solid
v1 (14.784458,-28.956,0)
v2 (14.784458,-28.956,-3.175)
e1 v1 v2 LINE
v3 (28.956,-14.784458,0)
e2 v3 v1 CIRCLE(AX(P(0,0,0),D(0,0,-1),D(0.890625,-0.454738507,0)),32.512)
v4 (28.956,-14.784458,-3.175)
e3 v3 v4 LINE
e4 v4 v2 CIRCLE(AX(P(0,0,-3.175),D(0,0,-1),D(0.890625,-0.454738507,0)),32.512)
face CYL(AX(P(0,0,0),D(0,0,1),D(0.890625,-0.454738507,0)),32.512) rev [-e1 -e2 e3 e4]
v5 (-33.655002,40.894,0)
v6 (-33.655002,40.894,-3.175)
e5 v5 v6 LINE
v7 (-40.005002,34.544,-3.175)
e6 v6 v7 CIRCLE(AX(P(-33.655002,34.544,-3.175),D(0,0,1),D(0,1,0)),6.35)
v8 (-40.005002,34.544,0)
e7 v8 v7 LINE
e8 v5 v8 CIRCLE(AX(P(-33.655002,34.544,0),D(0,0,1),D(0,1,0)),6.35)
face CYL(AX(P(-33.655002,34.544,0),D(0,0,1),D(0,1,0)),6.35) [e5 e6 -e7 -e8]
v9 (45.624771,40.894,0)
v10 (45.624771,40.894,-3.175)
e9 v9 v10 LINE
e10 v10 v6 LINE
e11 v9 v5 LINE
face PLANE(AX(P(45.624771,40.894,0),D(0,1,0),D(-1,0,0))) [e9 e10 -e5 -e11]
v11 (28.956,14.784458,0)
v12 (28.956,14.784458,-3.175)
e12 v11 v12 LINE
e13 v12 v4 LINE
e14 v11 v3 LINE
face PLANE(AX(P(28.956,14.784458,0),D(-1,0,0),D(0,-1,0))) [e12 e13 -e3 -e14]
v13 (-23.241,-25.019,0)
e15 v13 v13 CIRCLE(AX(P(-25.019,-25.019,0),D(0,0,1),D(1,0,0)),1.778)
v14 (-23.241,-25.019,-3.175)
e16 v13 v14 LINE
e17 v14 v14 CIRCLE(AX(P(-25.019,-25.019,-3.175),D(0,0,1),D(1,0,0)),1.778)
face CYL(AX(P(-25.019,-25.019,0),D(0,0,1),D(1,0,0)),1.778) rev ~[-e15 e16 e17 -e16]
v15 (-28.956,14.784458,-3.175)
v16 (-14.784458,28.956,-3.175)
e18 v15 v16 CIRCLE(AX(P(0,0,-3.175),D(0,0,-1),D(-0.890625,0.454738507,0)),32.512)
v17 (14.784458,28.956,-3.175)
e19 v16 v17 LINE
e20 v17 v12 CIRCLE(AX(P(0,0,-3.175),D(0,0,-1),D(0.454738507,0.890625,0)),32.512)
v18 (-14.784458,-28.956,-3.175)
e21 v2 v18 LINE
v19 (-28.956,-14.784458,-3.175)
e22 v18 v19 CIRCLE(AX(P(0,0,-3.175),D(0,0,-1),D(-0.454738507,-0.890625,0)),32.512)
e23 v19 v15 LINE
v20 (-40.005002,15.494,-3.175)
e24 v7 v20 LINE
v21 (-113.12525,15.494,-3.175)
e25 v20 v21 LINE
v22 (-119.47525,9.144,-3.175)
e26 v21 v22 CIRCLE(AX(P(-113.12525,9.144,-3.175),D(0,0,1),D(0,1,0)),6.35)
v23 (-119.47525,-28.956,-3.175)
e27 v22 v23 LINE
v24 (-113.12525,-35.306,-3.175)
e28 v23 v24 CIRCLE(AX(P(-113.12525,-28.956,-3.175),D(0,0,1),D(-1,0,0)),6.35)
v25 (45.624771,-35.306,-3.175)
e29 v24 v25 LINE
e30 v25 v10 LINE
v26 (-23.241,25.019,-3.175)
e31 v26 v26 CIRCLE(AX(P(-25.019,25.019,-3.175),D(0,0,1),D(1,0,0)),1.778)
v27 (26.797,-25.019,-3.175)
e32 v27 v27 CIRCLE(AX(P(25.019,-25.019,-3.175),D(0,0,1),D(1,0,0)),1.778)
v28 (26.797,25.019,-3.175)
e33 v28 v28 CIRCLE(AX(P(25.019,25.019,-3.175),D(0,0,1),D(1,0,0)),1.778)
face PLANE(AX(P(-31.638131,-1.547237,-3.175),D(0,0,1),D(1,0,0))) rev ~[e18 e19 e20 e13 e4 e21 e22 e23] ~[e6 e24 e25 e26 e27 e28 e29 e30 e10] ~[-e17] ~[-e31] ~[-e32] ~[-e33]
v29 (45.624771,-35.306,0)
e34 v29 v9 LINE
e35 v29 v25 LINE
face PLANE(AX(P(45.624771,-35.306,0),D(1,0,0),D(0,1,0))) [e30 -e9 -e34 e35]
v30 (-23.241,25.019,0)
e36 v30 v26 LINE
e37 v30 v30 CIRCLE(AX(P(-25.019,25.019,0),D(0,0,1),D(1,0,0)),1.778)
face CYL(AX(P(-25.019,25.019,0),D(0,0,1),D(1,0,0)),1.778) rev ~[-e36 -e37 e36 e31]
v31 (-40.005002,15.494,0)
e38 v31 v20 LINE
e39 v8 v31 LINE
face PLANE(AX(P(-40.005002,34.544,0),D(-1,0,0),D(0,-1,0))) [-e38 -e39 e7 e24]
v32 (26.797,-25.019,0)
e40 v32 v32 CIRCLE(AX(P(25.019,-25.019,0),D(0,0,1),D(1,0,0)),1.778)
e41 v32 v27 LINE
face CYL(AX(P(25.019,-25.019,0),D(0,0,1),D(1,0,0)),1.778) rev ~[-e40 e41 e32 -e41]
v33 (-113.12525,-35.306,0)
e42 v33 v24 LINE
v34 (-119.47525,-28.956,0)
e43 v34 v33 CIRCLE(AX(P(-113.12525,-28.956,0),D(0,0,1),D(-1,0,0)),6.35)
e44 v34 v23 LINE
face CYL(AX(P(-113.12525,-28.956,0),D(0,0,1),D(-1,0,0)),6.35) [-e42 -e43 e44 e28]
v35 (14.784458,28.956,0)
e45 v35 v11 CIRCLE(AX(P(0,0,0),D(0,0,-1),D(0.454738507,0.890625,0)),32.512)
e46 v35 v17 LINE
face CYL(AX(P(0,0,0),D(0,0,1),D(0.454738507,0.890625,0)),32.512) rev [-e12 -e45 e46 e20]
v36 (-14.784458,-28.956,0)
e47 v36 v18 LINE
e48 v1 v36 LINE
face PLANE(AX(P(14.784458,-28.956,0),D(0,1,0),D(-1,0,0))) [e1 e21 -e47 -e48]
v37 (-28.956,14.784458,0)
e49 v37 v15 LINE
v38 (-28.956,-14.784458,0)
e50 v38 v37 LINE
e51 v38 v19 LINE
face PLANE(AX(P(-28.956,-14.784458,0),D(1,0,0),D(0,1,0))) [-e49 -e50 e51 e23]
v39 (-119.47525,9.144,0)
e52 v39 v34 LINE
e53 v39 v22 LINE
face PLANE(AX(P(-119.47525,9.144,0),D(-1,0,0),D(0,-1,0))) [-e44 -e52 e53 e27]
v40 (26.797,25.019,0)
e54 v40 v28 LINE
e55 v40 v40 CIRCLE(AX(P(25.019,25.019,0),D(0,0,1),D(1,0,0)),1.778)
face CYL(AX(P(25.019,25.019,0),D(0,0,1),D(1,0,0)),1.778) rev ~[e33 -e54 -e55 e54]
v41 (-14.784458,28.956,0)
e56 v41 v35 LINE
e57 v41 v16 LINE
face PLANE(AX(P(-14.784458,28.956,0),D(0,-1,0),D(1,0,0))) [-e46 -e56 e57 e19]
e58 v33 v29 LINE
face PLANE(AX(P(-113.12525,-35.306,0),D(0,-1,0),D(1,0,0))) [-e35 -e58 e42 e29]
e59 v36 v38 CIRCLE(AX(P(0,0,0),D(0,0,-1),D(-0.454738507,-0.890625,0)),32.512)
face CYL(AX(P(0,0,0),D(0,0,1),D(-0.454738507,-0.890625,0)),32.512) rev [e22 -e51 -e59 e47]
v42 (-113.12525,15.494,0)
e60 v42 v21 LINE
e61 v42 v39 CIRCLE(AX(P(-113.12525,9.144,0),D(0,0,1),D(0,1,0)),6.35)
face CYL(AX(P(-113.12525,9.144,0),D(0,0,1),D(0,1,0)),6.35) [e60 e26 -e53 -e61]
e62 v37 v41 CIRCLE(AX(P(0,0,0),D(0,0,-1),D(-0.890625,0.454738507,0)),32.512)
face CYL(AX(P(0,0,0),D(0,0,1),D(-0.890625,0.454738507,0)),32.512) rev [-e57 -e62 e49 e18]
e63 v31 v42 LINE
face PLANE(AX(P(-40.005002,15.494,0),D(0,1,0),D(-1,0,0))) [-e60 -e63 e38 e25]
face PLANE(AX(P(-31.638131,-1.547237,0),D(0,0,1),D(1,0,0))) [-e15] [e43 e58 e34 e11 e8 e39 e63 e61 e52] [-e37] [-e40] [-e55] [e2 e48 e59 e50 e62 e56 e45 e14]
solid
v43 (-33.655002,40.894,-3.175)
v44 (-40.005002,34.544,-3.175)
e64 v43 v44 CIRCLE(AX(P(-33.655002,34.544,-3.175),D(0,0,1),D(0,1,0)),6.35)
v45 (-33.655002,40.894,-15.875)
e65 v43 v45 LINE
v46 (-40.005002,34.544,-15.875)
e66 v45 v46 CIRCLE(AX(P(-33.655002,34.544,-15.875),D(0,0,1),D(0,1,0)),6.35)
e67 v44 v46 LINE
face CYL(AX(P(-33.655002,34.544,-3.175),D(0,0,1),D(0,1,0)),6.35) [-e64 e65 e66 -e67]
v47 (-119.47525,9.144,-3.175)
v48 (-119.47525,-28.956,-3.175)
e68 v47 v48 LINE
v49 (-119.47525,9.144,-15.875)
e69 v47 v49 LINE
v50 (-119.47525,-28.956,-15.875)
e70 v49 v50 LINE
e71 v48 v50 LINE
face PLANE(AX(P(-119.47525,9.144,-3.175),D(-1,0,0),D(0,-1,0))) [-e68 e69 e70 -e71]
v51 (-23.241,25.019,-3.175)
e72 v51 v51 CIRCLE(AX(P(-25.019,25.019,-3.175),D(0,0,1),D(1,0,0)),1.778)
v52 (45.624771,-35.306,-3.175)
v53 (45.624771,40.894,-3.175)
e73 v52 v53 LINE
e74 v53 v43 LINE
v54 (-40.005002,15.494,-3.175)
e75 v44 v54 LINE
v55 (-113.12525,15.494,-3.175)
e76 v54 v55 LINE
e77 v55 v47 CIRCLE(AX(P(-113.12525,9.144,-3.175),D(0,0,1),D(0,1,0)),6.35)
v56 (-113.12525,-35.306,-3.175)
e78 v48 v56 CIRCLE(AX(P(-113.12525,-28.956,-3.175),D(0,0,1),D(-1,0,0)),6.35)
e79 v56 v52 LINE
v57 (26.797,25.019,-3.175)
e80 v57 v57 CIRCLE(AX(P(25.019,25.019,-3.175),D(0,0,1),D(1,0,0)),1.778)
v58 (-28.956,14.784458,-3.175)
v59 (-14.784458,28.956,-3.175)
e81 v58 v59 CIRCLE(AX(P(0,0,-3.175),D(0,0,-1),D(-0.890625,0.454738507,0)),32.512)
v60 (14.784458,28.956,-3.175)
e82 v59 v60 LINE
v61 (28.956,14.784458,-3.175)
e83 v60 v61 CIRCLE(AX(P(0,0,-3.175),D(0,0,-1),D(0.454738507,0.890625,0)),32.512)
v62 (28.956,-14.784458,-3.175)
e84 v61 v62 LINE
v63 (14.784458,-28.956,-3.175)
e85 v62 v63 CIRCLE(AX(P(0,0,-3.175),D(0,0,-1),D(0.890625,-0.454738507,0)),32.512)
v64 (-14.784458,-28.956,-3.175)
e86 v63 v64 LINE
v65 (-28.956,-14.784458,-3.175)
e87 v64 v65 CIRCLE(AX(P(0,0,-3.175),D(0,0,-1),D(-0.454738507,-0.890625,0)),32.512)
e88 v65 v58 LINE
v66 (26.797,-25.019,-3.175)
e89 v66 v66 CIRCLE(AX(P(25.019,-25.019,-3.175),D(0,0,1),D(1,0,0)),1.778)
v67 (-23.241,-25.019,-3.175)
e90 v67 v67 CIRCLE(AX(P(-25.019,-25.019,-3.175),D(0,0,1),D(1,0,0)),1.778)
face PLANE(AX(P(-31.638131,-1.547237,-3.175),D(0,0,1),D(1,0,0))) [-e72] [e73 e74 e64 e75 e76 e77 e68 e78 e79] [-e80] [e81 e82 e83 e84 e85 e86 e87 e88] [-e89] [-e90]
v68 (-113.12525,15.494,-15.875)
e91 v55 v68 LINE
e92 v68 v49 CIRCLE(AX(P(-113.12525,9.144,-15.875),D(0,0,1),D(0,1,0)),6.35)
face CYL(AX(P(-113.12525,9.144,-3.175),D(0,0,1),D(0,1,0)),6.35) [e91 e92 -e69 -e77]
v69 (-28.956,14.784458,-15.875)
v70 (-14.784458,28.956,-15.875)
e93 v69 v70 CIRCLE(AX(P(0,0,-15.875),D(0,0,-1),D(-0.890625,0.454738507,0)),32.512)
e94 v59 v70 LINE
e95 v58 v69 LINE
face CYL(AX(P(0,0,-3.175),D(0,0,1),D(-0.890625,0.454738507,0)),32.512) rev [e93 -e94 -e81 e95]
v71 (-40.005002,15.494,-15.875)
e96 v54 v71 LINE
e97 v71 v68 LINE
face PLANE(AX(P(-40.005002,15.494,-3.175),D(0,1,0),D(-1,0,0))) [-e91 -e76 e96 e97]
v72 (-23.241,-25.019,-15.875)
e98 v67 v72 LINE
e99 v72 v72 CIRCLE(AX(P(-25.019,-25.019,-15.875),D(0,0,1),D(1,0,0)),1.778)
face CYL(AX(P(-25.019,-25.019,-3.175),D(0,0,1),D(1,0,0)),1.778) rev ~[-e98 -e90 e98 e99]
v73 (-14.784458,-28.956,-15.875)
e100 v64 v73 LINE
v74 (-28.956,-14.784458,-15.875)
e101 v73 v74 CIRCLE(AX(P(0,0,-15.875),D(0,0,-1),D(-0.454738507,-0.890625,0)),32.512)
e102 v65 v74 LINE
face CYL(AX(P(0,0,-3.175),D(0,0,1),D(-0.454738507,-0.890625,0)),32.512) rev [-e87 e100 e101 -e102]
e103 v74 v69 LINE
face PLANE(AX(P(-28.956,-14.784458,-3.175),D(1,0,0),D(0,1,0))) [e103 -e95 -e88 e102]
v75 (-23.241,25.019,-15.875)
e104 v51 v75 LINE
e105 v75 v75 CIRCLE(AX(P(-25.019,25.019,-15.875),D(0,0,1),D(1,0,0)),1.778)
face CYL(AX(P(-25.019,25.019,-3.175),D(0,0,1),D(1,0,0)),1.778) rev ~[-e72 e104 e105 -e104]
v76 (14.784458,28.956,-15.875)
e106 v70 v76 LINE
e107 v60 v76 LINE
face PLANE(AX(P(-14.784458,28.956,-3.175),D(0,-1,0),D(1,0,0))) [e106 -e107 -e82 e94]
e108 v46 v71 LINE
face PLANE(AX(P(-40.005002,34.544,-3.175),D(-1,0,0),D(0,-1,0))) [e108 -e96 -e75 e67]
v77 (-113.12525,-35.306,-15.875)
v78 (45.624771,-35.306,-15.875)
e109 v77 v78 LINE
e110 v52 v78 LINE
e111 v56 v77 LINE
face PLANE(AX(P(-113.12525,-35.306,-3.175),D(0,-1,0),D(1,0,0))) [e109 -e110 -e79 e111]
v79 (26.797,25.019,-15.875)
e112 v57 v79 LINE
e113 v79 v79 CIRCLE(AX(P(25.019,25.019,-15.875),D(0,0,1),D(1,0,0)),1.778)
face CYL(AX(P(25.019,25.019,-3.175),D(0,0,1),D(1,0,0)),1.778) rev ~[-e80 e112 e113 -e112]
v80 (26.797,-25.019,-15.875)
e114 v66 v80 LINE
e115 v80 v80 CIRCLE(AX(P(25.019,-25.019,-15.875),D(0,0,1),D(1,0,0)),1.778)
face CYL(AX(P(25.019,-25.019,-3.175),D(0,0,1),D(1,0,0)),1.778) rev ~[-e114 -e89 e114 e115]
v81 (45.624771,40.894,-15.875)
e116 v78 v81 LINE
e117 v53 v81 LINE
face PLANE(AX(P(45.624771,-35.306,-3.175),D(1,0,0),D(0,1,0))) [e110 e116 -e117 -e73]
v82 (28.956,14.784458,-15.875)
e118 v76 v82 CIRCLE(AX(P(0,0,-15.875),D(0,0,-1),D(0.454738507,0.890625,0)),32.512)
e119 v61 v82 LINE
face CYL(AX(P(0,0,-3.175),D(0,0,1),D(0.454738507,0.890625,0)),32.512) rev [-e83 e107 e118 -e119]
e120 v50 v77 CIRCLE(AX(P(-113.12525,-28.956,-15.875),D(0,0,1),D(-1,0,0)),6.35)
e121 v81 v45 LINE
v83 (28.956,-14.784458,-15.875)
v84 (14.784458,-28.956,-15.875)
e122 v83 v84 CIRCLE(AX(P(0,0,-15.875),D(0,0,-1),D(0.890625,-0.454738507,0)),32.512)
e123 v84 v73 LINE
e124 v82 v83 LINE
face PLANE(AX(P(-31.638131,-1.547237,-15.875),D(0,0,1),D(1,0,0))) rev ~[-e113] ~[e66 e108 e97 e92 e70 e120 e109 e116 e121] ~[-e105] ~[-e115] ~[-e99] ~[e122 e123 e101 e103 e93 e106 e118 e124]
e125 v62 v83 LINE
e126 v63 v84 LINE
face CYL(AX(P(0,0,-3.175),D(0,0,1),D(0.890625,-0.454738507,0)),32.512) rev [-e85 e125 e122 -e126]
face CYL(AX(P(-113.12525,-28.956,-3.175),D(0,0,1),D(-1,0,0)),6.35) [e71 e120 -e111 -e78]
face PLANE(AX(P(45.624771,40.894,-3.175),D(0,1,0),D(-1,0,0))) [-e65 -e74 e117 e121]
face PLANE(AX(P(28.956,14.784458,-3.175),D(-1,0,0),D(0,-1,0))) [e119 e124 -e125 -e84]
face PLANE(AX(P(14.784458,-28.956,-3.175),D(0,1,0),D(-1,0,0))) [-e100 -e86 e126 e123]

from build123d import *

# Parameters (mm, degrees)
F0_R     = 1.778
F1_DEPTH = 3.175
F2_DEPTH = 12.7


# Not quite as in the source:
# - a length typed as a fraction of an inch, garbled in the dataset ("3 / 203.2 mm" for 3/8 in), is restored
# - a feature names something its author has since deleted; it is built from what else it names


with BuildPart() as f1:
    # F0 (on Top) → F1 (new body)
    with BuildSketch(Plane.XY):
        with BuildLine():
            Line((-113.12525, -35.306), (32.92475, -35.306))
            Line((32.92475, -35.306), (45.6247710268, -35.306))
            Line((45.6247710268, -35.306), (45.6247710268, 40.894))
            Line((45.6247710268, 40.894), (32.92475, 40.894))
            Line((32.92475, 40.894), (-33.6550021708, 40.894))
            ThreePointArc((-33.6550021708, 40.894), (-38.1451302313, 39.0341280605), (-40.0050021708, 34.544))
            Line((-40.0050021708, 34.544), (-40.0050021708, 15.494))
            Line((-40.0050021708, 15.494), (-113.12525, 15.494))
            ThreePointArc((-113.12525, 15.494), (-117.6153780605, 13.6341280605), (-119.47525, 9.144))
            Line((-119.47525, 9.144), (-119.47525, -28.956))
            ThreePointArc((-119.47525, -28.956), (-117.6153780605, -33.4461280605), (-113.12525, -35.306))
        make_face()
        with Locations((-25.019, -25.019)):
            Circle(F0_R, mode=Mode.SUBTRACT)
        with Locations((25.019, -25.019)):
            Circle(F0_R, mode=Mode.SUBTRACT)
        with BuildLine():
            ThreePointArc((-28.956, 14.7844583262), (-22.9894556699, 22.9894556699), (-14.7844583262, 28.956))
            Line((-14.7844583262, 28.956), (14.7844583262, 28.956))
            ThreePointArc((14.7844583262, 28.956), (22.9894556699, 22.9894556699), (28.956, 14.7844583262))
            Line((28.956, 14.7844583262), (28.956, -14.7844583262))
            ThreePointArc((28.956, -14.7844583262), (22.9894556699, -22.9894556699), (14.7844583262, -28.956))
            Line((14.7844583262, -28.956), (-14.7844583262, -28.956))
            ThreePointArc((-14.7844583262, -28.956), (-22.9894556699, -22.9894556699), (-28.956, -14.7844583262))
            Line((-28.956, -14.7844583262), (-28.956, 14.7844583262))
        make_face(mode=Mode.SUBTRACT)
        with Locations((-25.019, 25.019)):
            Circle(F0_R, mode=Mode.SUBTRACT)
        with Locations((25.019, 25.019)):
            Circle(F0_R, mode=Mode.SUBTRACT)
    extrude(amount=-F1_DEPTH)


with BuildPart() as f2:
    # F2 (new): a face of the model
    f2_faces = [f1.part.faces().sort_by_distance(p)[0] for p in [
        (-40.3802916148, -2.9400750607, -3.175),
    ]]
    extrude(f2_faces, amount=F2_DEPTH)


solid = Compound([f1.part, f2.part])
